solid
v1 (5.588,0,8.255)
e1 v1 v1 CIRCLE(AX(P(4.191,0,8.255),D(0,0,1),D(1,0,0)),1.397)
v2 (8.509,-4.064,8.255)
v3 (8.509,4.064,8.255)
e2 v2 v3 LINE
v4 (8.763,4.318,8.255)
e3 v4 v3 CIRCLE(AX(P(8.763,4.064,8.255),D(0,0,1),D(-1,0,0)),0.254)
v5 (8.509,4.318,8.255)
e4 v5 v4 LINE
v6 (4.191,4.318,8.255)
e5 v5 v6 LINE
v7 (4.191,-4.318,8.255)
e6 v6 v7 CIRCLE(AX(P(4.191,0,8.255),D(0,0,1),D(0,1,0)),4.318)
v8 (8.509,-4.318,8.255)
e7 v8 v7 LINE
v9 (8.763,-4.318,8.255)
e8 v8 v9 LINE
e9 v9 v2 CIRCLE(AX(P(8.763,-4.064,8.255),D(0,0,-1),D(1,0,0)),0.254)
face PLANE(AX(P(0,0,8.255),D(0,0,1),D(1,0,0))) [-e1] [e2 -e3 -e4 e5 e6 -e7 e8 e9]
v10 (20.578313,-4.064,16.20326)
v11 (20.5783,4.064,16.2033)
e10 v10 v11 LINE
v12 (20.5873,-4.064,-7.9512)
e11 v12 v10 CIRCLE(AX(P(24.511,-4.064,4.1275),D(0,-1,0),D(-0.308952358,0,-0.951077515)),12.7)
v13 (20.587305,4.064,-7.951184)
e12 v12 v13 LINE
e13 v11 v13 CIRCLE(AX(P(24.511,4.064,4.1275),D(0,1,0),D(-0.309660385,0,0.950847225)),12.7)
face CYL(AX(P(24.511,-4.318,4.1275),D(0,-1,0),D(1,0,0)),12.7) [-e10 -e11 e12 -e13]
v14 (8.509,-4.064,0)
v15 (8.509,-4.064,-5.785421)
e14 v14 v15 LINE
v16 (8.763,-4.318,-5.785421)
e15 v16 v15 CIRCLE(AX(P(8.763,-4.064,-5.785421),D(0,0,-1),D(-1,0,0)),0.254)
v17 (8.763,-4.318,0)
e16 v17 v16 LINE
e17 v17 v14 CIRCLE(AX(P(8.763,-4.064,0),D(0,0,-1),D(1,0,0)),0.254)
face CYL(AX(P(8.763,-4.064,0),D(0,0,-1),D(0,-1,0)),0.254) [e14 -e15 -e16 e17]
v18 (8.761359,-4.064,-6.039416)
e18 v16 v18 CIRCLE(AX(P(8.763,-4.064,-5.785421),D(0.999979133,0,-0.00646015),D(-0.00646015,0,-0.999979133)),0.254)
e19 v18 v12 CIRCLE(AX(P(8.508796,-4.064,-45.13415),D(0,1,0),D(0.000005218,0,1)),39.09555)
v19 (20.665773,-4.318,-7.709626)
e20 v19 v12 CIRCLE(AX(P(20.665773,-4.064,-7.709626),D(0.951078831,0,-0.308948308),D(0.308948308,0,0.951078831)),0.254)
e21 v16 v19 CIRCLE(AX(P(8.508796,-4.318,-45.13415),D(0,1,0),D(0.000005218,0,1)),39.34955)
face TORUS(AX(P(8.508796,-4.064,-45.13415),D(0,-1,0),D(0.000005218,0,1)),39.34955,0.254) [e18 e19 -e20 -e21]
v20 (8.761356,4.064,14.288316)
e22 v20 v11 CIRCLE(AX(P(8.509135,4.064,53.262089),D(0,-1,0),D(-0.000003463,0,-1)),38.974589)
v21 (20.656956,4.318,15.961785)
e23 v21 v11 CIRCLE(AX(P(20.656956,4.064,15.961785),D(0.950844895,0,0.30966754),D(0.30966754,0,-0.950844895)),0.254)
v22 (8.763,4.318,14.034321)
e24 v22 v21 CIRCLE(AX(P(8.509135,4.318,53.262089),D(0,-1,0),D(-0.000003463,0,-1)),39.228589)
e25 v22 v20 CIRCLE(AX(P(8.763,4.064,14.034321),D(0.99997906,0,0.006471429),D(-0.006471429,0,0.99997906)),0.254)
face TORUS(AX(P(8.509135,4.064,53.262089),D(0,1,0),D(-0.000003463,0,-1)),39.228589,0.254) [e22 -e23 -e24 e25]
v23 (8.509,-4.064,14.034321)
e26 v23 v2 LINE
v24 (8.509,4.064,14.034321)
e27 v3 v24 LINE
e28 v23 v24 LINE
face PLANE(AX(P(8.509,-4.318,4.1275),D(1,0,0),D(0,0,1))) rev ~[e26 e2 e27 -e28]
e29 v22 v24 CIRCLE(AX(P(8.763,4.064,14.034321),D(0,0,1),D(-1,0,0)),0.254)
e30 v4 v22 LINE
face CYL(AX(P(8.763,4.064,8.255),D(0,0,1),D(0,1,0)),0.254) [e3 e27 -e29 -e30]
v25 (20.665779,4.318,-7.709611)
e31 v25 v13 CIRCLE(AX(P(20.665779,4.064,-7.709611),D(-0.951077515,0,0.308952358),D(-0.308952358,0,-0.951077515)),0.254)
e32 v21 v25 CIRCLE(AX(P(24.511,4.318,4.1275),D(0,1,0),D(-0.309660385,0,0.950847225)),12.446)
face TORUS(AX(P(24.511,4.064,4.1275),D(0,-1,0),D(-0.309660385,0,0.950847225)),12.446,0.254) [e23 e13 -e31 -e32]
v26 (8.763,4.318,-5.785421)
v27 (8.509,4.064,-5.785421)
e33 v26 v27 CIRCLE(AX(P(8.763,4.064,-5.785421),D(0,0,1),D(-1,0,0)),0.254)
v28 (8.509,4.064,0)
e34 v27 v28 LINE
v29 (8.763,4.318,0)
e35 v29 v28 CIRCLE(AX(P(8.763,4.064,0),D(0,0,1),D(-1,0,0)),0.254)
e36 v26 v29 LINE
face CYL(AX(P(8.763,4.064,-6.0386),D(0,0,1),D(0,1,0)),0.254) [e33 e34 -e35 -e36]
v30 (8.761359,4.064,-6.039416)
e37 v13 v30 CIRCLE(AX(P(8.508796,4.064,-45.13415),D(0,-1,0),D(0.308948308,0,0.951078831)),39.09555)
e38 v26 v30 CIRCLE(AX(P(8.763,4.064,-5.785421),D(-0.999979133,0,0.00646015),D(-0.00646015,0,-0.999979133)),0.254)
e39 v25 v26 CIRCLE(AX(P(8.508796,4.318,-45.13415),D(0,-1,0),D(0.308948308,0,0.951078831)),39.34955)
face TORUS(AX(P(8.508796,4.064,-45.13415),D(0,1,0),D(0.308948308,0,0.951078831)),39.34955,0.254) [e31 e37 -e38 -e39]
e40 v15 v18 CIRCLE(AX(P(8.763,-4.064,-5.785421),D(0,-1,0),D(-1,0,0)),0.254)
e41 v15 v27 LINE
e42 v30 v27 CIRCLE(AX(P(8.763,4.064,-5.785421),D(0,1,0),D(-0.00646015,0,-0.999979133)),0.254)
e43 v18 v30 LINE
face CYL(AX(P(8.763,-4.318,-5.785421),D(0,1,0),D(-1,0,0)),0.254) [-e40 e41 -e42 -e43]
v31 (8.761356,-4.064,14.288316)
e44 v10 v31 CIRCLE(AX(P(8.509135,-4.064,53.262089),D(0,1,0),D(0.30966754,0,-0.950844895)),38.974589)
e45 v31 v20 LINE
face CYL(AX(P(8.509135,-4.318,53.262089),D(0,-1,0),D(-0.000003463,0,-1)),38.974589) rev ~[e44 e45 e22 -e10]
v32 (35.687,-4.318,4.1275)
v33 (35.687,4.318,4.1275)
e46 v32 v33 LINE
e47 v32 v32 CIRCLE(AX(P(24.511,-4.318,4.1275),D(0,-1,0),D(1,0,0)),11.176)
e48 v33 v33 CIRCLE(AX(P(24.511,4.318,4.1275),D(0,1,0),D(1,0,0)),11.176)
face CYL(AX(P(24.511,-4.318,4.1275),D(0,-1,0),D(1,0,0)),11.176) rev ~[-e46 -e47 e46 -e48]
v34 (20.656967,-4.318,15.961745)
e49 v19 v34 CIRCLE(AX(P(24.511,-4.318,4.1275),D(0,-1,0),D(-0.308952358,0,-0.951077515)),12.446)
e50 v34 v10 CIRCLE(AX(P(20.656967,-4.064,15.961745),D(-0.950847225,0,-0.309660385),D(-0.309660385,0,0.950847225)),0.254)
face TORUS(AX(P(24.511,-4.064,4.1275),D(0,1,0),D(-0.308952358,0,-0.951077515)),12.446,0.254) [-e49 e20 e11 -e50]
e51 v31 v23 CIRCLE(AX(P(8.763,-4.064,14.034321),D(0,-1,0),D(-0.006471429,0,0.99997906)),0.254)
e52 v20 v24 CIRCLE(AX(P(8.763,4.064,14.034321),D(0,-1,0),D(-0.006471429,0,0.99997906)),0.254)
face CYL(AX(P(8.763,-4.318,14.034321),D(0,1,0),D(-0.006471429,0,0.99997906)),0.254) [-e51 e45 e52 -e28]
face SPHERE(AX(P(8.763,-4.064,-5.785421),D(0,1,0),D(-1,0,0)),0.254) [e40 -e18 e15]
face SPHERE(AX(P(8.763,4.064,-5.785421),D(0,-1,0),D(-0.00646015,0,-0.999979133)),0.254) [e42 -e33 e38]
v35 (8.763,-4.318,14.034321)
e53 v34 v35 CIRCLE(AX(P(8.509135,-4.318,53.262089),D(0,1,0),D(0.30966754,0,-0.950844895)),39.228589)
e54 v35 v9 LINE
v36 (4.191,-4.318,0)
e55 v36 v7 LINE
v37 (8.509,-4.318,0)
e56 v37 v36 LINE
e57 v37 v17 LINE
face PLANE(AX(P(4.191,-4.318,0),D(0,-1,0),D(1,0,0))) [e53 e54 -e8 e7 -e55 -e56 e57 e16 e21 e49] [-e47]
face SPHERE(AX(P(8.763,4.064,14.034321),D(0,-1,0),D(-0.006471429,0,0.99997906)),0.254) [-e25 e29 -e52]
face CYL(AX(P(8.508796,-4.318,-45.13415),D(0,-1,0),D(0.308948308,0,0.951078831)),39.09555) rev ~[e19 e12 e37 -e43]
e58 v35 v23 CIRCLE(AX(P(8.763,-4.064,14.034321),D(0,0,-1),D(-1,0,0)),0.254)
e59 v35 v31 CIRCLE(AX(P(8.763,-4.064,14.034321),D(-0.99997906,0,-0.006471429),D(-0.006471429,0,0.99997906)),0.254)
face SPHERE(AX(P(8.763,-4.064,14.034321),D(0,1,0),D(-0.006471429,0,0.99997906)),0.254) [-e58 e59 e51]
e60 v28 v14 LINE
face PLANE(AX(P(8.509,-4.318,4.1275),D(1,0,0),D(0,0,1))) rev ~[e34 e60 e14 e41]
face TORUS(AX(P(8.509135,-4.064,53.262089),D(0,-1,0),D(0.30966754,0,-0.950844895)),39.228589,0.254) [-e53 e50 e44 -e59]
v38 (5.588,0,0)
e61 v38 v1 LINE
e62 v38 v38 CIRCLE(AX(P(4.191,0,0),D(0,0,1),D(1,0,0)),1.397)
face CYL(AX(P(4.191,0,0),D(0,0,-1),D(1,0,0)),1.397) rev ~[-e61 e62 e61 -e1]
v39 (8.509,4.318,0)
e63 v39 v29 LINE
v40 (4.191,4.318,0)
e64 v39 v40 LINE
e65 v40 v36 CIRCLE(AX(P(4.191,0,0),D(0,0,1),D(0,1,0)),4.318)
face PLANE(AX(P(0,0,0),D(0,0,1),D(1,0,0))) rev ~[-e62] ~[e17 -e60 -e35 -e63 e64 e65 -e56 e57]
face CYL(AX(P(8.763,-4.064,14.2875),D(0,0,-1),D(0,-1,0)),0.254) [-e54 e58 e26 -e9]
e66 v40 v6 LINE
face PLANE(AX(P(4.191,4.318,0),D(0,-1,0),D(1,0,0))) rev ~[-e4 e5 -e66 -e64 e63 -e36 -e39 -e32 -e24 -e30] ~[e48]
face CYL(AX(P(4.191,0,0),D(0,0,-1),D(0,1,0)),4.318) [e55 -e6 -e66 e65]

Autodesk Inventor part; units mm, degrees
ref_plane "YZ Plane" through (0, 0, 0) normal (1, 0, 0) x (0, 1, 0)
sketch "Sketch2" plane through (0, 0, 0) normal (0, 0, 1) x (1, 0, 0)
  arc A0 (4.191, -4.318) -> (4.191, 4.318) centre (4.191, 0) ccw projected
  arc A1 (4.191, 4.318) -> (4.191, -4.318) centre (4.191, 0) ccw
  circle A2 centre (4.191, 0) radius 1.397 projected
  line L0 (8.509, 0) -> (8.509, 4.318)
  line L1 (8.509, 4.318) -> (4.191, 4.318)
  line L2 (8.509, 0) -> (8.509, -4.318)
  line L3 (8.509, -4.318) -> (4.191, -4.318)
  point P0 (0, 0)
ref_plane "Work Plane1" through (0, -4.064, 8.255) normal (0, 0, -1) x (0, 1, 0)
extrude "Extrusion1" add sketch "Sketch2" along normal up to surface (8.255 mm away)
ref_plane "Work Plane2" through (0, 0, 4.1275) normal (0, 0, -1) x (-1, 0, 0)
sketch "Sketch3" plane through (4.191, -4.318, 0) normal (0, -1, 0) x (1, 0, 0)
  circle A0 centre (20.32, 4.1275) radius 12.7
  line L0 (40.4876, 4.1275) -> (-11.7856, 4.1275) projected
  line L1 (4.318, 0) -> (4.318, 8.255) projected
  circle A1 centre (20.32, 4.1275) radius 11.176
  line L2 (0, 14.2875) -> (4.064, 14.2875) projected
  line L3 (4.064, -6.0325) -> (0, -6.0325) projected
  line L4 (0, 0) -> (4.318, 0) projected
  line L5 (4.318, 0) -> (4.318, -6.0386)
  line L6 (4.318, 8.255) -> (4.318, 14.2875)
  arc A2 (4.318, 14.2875) -> (16.3873, 16.2033) centre (4.318, 53.2638) ccw
  arc A3 (16.3963, -7.9512) -> (4.318, -6.0386) centre (4.318, -45.1333) ccw
  point P0 (-4.191, 0)
  dimension "d2" = 25.4
  dimension "d3" = 0
  dimension "d4" = 16.002
  dimension "d5" = 1.524
  dimension "d8" = 0
  dimension "d9" = 0.0061
extrude "Extrusion2" add sketch "Sketch3" against normal up to surface (8.636 mm away) contours L0 A1 A0 | A0 L0 A1 | A0 L0 L1 L6 A2 | A3 L5 L1 L0 A0
fillet "Fillet1" radius 0.254 12 edges at (8.509, 4.318, -3.0193) (8.509, 4.318, 11.2712) (8.509, 0, -6.0386) (8.509, -4.318, -3.0193) (8.509, -4.318, 11.2712) (8.509, 0, 14.2875) (37.211, -4.318, 4.1322) (14.6234, -4.318, -6.5197) (14.6192, -4.318, 14.7694) (37.211, 4.318, 4.1322) (14.6234, 4.318, -6.5197) (14.6192, 4.318, 14.7694)
properties part number "wrenchB"
